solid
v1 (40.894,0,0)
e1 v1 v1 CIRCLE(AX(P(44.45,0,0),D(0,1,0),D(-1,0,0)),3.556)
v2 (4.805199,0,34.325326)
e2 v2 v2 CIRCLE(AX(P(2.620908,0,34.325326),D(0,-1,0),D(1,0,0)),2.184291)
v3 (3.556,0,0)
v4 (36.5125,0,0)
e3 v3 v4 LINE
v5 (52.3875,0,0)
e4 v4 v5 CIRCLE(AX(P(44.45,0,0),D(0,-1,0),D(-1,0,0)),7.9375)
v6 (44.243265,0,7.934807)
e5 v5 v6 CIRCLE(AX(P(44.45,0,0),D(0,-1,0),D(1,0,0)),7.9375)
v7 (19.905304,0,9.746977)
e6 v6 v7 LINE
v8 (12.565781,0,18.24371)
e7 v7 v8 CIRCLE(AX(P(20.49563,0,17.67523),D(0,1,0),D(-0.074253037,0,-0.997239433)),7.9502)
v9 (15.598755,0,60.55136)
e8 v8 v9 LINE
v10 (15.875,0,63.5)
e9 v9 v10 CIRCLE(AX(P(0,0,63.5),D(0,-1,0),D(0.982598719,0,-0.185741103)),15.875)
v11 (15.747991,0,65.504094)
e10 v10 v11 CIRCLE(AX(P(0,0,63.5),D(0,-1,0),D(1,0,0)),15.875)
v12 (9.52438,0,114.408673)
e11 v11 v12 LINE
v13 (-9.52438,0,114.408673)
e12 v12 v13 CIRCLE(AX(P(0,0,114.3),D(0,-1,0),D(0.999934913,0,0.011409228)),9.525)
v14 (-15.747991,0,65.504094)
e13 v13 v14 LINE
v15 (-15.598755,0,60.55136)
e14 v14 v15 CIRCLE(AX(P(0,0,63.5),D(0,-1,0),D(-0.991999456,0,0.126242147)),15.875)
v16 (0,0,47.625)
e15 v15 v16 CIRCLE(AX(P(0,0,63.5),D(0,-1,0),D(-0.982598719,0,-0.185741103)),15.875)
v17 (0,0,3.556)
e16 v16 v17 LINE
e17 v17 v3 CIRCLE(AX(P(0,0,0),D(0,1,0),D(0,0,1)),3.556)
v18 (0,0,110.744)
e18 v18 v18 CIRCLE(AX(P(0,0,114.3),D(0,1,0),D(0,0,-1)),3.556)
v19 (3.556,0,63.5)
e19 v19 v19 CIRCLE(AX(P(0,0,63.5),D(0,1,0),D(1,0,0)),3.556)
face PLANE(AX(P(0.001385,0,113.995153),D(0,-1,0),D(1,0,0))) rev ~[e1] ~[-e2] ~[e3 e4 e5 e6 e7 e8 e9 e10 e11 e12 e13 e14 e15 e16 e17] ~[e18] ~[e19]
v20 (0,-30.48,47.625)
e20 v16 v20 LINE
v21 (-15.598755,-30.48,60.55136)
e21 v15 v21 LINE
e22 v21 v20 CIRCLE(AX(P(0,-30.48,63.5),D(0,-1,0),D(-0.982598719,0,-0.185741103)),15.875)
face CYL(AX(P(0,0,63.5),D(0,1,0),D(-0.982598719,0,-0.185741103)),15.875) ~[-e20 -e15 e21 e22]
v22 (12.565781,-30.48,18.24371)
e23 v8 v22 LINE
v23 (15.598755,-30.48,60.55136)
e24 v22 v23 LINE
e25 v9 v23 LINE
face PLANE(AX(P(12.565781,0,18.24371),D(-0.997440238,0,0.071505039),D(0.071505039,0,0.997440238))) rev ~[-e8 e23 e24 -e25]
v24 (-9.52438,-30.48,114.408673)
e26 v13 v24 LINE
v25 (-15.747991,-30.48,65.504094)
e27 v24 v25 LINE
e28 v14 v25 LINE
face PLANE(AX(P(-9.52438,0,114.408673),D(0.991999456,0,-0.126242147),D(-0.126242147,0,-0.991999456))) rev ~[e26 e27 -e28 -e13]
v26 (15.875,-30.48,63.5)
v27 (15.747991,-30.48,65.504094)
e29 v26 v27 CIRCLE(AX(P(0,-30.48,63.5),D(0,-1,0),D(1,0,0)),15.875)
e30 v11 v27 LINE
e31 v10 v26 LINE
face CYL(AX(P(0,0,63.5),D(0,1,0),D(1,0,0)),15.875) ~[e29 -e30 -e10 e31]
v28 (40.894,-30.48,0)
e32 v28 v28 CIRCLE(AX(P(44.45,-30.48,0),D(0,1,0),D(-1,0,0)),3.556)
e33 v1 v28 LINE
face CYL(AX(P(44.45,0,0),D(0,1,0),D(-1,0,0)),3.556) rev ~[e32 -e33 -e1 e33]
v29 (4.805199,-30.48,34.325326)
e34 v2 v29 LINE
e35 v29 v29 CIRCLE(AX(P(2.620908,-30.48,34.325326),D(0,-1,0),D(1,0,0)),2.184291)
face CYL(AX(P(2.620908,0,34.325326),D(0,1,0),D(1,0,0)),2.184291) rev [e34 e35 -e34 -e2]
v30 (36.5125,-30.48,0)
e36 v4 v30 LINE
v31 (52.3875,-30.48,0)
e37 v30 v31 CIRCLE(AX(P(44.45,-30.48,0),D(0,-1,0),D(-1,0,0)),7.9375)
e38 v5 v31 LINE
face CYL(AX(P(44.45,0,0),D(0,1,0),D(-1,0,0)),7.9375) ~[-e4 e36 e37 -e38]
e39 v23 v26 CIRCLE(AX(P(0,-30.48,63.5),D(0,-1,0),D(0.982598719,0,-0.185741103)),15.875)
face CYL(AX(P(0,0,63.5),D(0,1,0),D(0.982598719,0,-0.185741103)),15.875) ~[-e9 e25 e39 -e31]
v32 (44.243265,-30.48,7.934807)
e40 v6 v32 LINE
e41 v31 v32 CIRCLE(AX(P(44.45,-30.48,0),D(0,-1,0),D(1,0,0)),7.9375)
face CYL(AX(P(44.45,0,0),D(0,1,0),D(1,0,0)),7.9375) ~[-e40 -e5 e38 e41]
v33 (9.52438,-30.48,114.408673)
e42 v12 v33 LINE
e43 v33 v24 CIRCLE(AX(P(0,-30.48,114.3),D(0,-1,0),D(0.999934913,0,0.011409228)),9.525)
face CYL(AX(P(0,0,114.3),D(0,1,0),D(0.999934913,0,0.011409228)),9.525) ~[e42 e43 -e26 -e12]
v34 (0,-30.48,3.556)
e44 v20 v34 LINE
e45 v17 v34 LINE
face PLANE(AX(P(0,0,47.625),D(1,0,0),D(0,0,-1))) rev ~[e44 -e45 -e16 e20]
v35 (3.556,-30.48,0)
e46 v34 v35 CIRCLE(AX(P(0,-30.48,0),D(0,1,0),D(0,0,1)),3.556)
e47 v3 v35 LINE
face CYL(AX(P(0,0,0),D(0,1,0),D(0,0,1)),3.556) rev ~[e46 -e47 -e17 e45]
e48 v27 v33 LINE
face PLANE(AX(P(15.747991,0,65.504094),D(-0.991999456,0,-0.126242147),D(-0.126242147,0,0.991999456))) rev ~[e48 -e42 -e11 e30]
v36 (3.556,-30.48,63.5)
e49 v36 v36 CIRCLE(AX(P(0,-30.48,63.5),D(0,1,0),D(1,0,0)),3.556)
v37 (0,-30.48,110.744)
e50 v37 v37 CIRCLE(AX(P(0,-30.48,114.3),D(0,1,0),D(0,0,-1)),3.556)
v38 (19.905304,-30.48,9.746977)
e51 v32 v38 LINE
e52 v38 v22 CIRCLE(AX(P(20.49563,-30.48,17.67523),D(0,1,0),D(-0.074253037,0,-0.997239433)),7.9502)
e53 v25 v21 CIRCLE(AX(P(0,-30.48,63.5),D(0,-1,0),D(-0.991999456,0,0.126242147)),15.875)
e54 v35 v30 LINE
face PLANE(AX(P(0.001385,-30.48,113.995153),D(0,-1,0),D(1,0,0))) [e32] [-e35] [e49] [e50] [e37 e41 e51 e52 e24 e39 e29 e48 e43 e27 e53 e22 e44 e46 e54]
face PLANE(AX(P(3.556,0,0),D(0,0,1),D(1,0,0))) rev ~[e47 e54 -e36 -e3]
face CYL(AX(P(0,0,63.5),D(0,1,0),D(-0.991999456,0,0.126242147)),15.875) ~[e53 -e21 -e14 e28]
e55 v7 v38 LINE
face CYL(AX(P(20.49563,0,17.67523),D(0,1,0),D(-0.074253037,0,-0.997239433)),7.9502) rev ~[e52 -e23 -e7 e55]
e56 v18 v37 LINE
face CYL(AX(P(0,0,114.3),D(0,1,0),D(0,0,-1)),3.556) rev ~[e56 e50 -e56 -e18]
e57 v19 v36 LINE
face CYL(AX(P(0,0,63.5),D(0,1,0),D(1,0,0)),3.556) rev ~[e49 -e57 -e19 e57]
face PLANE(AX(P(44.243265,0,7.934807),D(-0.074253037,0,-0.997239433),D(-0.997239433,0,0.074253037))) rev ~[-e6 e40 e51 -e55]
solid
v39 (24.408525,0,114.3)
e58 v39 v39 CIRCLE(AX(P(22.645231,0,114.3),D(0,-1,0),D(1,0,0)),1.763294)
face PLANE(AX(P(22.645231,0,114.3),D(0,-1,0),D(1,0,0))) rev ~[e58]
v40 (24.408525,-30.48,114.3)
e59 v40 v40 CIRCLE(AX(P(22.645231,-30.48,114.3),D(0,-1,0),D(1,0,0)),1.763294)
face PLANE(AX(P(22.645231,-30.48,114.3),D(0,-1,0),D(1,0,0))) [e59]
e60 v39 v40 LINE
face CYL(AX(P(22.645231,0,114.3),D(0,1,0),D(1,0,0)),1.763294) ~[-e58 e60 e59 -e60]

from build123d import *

# Parameters (mm, degrees)
F0_R     = 2.1842909743
F1_DEPTH = 30.48
F0_R_2   = 1.7632939696


with BuildPart() as f1:
    # F0 (on Front) → F1 (new body)
    with BuildSketch(Plane.XZ):
        with BuildLine():
            ThreePointArc((-9.5243800429, 114.4086728964), (-6.7735047921, 107.6033398002), (0, 104.775))
            ThreePointArc((0, 104.775), (6.7351920908, 107.5648079092), (9.525, 114.3))
            ThreePointArc((9.525, 114.3), (9.5248450095, 114.3543373324), (9.5243800429, 114.4086728964))
            ThreePointArc((9.5243800429, 114.4086728964), (0, 123.825), (-9.5243800429, 114.4086728964))
        make_face()
        with BuildLine():
            ThreePointArc((3.556, 114.3), (2.5144717139, 111.7855282861), (0, 110.744))
            ThreePointArc((0, 110.744), (-2.5144717139, 116.8144717139), (3.556, 114.3))
        make_face(mode=Mode.SUBTRACT)
        with BuildLine():
            ThreePointArc((9.525, 114.3), (6.7351920908, 107.5648079092), (0, 104.775))
            Line((0, 104.775), (0, 79.375))
            ThreePointArc((0, 79.375), (10.4928697542, 75.4128212159), (15.7479913604, 65.5040940878))
            Line((15.7479913604, 65.5040940878), (9.5243800429, 114.4086728964))
            ThreePointArc((9.5243800429, 114.4086728964), (9.5248450095, 114.3543373324), (9.525, 114.3))
        make_face()
        with BuildLine():
            Line((0, 79.375), (0, 104.775))
            ThreePointArc((0, 104.775), (-6.7735047921, 107.6033398002), (-9.5243800429, 114.4086728964))
            Line((-9.5243800429, 114.4086728964), (-15.7479913604, 65.5040940878))
            ThreePointArc((-15.7479913604, 65.5040940878), (-10.4928697542, 75.4128212159), (0, 79.375))
        make_face()
        with BuildLine():
            ThreePointArc((15.7479913604, 65.5040940878), (10.4928697542, 75.4128212159), (0, 79.375))
            Line((0, 79.375), (0, 67.056))
            ThreePointArc((0, 67.056), (2.5144717139, 66.0144717139), (3.556, 63.5))
            ThreePointArc((3.556, 63.5), (2.5144717139, 60.9855282861), (0, 59.944))
            Line((0, 59.944), (0, 47.625))
            ThreePointArc((0, 47.625), (10.1293130273, 51.2765535713), (15.5987546644, 60.5513599881))
            ThreePointArc((15.5987546644, 60.5513599881), (15.8057877896, 62.0192240712), (15.875, 63.5))
            ThreePointArc((15.875, 63.5), (15.8432160221, 64.5040573076), (15.7479913604, 65.5040940878))
        make_face()
        with BuildLine():
            Line((0, 67.056), (0, 79.375))
            ThreePointArc((0, 79.375), (-10.4928697542, 75.4128212159), (-15.7479913604, 65.5040940878))
            ThreePointArc((-15.7479913604, 65.5040940878), (-15.8677980625, 63.0218685866), (-15.5987546644, 60.5513599881))
            ThreePointArc((-15.5987546644, 60.5513599881), (-10.1293130273, 51.2765535713), (0, 47.625))
            Line((0, 47.625), (0, 59.944))
            ThreePointArc((0, 59.944), (-3.556, 63.5), (0, 67.056))
        make_face()
        with BuildLine():
            ThreePointArc((15.5987546644, 60.5513599881), (10.1293130273, 51.2765535713), (0, 47.625))
            Line((0, 47.625), (0, 11.2290981952))
            ThreePointArc((0, 11.2290981952), (7.9401714804, 7.9401714804), (11.2290981952, 0))
            Line((11.2290981952, 0), (36.5125, 0))
            ThreePointArc((36.5125, 0), (38.764717935, 5.539086034), (44.2432651255, 7.9348073034))
            Line((44.2432651255, 7.9348073034), (19.9053036746, 9.7469774609))
            ThreePointArc((19.9053036746, 9.7469774609), (14.4792388722, 12.4782393627), (12.5657807814, 18.2437097642))
            Line((12.5657807814, 18.2437097642), (15.5987546644, 60.5513599881))
        make_face()
        with Locations((2.6209076754, 34.3253262466)):
            Circle(F0_R, mode=Mode.SUBTRACT)
        with BuildLine():
            ThreePointArc((11.2290981952, 0), (7.9401714804, 7.9401714804), (0, 11.2290981952))
            Line((0, 11.2290981952), (0, 3.556))
            ThreePointArc((0, 3.556), (2.5144717139, 2.5144717139), (3.556, 0))
            Line((3.556, 0), (11.2290981952, 0))
        make_face()
        with BuildLine():
            ThreePointArc((44.2432651255, 7.9348073034), (38.764717935, 5.539086034), (36.5125, 0))
            ThreePointArc((36.5125, 0), (44.45, -7.9375), (52.3875, 0))
            ThreePointArc((52.3875, 0), (49.989086034, 5.685282065), (44.2432651255, 7.9348073034))
        make_face()
        with BuildLine():
            ThreePointArc((48.006, 0), (44.45, -3.556), (40.894, 0))
            ThreePointArc((40.894, 0), (44.45, 3.556), (48.006, 0))
        make_face(mode=Mode.SUBTRACT)
    extrude(amount=F1_DEPTH)


with BuildPart() as f1b:
    # F0 (on Front) → F1, piece 2 (new body)
    with BuildSketch(Plane.XZ):
        with Locations((22.6452313364, 114.3)):
            Circle(F0_R_2)
    extrude(amount=F1_DEPTH)


solid = Compound([f1.part, f1b.part])
